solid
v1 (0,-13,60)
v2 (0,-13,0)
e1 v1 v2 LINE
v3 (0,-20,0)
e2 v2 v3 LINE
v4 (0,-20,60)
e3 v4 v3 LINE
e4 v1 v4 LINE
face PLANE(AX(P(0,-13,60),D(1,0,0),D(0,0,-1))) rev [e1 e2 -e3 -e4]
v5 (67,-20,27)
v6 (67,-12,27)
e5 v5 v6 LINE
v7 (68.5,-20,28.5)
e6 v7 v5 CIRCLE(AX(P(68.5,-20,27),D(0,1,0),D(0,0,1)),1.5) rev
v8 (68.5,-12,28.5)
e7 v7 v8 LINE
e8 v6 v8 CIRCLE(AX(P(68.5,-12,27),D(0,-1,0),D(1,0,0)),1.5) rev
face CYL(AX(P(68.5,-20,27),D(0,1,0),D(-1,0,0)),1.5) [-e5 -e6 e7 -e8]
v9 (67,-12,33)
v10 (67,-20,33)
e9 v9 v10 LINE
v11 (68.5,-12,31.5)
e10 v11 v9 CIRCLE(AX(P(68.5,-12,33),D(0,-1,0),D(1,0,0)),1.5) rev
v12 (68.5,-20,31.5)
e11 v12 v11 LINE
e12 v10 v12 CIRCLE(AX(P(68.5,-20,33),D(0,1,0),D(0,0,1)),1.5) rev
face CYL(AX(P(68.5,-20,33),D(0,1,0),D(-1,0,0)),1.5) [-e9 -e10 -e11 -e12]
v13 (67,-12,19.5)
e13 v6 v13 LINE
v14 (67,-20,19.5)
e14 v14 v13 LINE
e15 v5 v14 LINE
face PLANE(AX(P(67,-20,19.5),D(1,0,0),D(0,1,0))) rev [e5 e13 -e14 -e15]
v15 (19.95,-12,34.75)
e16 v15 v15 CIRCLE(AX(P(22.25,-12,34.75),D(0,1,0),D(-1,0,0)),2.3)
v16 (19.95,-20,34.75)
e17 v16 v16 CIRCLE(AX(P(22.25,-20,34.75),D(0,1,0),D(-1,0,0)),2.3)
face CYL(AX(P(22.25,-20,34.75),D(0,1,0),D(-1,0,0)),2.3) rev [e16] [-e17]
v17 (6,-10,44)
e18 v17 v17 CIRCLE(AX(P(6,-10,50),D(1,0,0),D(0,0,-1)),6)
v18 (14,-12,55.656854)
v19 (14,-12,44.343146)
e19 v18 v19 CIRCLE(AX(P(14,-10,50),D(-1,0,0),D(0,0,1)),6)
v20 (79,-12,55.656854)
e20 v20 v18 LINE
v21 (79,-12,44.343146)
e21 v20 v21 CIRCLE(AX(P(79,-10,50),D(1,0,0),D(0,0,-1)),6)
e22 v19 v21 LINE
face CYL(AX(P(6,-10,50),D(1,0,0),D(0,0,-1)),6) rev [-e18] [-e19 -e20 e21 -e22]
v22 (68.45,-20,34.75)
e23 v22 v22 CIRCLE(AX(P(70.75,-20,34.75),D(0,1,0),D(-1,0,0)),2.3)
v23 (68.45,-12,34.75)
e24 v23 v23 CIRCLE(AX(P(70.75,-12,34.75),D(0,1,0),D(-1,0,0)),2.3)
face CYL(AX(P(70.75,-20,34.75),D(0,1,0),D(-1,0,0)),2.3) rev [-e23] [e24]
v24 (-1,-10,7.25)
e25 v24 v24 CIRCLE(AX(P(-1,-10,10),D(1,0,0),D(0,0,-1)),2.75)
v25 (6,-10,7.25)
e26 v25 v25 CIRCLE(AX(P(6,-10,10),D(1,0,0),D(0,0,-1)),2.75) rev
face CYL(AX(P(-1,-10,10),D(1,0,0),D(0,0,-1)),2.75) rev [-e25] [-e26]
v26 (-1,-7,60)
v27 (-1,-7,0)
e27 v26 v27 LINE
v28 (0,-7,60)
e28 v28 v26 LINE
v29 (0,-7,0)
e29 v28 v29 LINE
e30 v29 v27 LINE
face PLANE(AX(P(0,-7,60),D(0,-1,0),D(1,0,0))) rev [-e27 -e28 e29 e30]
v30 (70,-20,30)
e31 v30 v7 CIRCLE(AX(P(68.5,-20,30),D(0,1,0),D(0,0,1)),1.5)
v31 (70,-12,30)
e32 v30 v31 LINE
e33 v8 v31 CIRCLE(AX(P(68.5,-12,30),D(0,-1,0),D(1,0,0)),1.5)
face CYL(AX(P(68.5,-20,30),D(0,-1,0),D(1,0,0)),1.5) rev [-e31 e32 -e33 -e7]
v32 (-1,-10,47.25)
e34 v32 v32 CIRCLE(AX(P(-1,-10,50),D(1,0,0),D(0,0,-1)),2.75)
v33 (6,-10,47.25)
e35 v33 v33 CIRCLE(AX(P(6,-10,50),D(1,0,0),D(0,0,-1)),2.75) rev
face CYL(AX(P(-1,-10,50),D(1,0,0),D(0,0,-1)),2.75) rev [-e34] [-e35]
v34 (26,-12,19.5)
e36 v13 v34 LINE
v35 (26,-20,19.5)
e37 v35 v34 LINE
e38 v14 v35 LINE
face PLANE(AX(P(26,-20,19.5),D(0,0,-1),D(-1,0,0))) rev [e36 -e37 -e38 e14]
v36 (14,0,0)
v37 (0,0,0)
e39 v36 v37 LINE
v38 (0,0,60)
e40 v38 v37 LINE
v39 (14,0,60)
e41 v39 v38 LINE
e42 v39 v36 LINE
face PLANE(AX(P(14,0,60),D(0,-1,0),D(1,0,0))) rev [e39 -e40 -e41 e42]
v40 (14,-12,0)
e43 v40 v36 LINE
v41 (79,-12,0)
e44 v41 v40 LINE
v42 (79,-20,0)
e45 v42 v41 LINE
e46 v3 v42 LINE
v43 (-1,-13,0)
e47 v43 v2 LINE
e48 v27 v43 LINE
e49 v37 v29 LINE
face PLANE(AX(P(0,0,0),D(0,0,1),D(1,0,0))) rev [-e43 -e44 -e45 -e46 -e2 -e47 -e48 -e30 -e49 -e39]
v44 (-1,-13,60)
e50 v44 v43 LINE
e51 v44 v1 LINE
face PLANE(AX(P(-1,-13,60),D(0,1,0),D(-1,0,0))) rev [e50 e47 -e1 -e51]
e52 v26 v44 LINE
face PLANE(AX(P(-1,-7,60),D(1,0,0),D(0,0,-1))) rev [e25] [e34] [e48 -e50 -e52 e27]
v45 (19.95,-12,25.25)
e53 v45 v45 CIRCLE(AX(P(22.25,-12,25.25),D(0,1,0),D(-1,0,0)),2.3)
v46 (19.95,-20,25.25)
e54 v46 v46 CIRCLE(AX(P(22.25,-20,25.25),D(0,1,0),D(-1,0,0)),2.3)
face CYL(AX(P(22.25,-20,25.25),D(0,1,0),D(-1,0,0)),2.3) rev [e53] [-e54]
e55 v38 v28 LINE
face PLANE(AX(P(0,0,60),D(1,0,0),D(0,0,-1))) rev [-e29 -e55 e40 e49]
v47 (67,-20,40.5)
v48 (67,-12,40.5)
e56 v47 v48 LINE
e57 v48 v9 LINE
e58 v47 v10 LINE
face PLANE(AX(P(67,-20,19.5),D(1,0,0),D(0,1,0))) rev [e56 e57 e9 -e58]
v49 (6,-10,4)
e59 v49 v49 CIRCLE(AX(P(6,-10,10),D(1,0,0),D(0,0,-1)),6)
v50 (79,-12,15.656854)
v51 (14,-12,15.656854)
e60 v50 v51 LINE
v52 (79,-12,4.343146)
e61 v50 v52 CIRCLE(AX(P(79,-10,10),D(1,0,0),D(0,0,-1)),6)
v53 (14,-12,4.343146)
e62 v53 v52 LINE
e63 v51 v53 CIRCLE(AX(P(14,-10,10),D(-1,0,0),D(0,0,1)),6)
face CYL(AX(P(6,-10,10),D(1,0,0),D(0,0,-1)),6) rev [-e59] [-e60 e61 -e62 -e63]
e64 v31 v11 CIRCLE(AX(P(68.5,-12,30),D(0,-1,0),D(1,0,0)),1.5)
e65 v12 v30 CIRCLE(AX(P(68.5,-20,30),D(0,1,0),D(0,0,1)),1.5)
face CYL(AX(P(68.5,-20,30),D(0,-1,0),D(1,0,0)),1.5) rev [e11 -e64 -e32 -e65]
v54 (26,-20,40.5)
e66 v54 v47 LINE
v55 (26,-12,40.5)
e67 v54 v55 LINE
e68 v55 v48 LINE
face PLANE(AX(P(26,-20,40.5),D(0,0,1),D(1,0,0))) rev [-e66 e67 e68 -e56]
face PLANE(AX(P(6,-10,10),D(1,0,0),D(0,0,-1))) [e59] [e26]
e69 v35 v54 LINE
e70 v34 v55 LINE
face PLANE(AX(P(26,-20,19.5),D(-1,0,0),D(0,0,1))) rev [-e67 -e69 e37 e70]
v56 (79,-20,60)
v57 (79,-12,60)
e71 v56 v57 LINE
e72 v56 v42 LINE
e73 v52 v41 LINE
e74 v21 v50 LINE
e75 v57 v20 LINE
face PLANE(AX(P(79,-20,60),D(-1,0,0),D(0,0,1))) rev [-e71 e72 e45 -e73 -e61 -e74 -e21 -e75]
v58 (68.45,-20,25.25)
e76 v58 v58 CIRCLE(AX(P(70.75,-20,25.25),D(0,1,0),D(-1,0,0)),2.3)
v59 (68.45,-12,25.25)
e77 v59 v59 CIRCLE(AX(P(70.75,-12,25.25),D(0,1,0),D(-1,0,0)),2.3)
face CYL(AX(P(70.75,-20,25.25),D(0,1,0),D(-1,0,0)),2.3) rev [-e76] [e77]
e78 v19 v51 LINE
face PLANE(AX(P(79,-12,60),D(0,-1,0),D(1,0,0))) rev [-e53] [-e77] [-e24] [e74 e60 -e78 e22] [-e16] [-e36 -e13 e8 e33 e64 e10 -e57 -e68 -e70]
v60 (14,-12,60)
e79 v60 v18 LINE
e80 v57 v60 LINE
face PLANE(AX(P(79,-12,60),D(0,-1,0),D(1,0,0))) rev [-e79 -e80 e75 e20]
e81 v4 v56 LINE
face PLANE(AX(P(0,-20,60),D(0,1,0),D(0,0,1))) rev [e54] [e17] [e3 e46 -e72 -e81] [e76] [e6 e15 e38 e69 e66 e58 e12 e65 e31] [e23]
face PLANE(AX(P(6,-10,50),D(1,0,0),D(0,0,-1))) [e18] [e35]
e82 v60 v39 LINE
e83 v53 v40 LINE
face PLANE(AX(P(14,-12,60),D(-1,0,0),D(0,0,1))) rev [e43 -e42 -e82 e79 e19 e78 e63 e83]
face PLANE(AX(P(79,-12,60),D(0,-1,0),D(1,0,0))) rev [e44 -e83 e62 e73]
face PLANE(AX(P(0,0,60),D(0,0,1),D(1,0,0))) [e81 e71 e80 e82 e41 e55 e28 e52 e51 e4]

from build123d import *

# Parameters (mm, degrees)
SALIENTE_EXTRUIR1_DEPTH = 60
CROQUIS2_R              = 2.75
CORTAR_EXTRUIR1_DEPTH   = 91.691785736
CROQUIS4_R              = 6
CORTAR_EXTRUIR2_DEPTH   = 73
CROQUIS5_W              = 41
CROQUIS5_H              = 21
CORTAR_EXTRUIR3_DEPTH   = 100.924971854
CROQUIS6_R              = 2.3
CORTAR_EXTRUIR4_DEPTH   = 100.924971854
CROQUIS7_W              = 3
CROQUIS7_H              = 3
CORTAR_EXTRUIR5_DEPTH   = 90.269255626
REDONDEO3_R             = 1.5


with BuildPart() as part:
    # Croquis1 → Saliente-Extruir1 (new body)
    with BuildSketch(Plane.XY):
        Polygon((0, 0), (0, -7), (-1, -7), (-1, -13), (0, -13), (0, -20), (79, -20), (79, -12), (14, -12), (14, 0), align=None)
    extrude(amount=SALIENTE_EXTRUIR1_DEPTH)

    # Croquis2 → Cortar-Extruir1 (cut, through all)
    with BuildSketch(Plane(origin=(14, 0, 0), x_dir=(0, 0, -1), z_dir=(1, 0, 0))):
        with Locations((-50, -10)):
            Circle(CROQUIS2_R)
        with Locations((-10, -10)):
            Circle(CROQUIS2_R)
    extrude(amount=-CORTAR_EXTRUIR1_DEPTH, mode=Mode.SUBTRACT)

    # Croquis4 → Cortar-Extruir2 (cut)
    with BuildSketch(Plane(origin=(79, 0, 0), x_dir=(0, 0, -1), z_dir=(1, 0, 0))):
        with Locations((-50, -10)):
            Circle(CROQUIS4_R)
        with Locations((-10, -10)):
            Circle(CROQUIS4_R)
    extrude(amount=-CORTAR_EXTRUIR2_DEPTH, mode=Mode.SUBTRACT)

    # Croquis5 → Cortar-Extruir3 (cut, through all)
    with BuildSketch(Plane(origin=(0, -12, 0), x_dir=(1, 0, 0), z_dir=(0, 1, 0))):
        with Locations((46.5, -30)):
            Rectangle(CROQUIS5_W, CROQUIS5_H)
    extrude(amount=-CORTAR_EXTRUIR3_DEPTH, mode=Mode.SUBTRACT)

    # Croquis6 → Cortar-Extruir4 (cut, through all)
    with BuildSketch(Plane(origin=(0, -12, 0), x_dir=(1, 0, 0), z_dir=(0, 1, 0))):
        with Locations(Location((22.25, -25.25, 0), (0, 0, 180))):
            Circle(CROQUIS6_R)
        with Locations(Location((22.25, -34.75, 0), (0, 0, 180))):
            Circle(CROQUIS6_R)
        with Locations(Location((70.75, -25.25, 0), (0, 0, 180))):
            Circle(CROQUIS6_R)
        with Locations(Location((70.75, -34.75, 0), (0, 0, 180))):
            Circle(CROQUIS6_R)
    extrude(amount=-CORTAR_EXTRUIR4_DEPTH, mode=Mode.SUBTRACT)

    # Croquis7 → Cortar-Extruir5 (cut, through all)
    with BuildSketch(Plane(origin=(14, -12, 60), x_dir=(1, 0, 0), z_dir=(0, 1, 0))):
        with Locations((54.5, 30)):
            Rectangle(CROQUIS7_W, CROQUIS7_H)
    extrude(amount=-CORTAR_EXTRUIR5_DEPTH, mode=Mode.SUBTRACT)

    # Redondeo3
    redondeo3_edges = [part.edges().sort_by_distance(p)[0] for p in [
        (70, -16, 31.5),
        (70, -16, 28.5),
    ]]
    fillet(redondeo3_edges, radius=REDONDEO3_R - 0.0001)  # a hair under: the kernel refuses the full size
    redondeo3_2_edges = [part.edges().sort_by_distance(p)[0] for p in [
        (67, -16, 28.5),
        (67, -16, 31.5),
    ]]
    fillet(redondeo3_2_edges, radius=REDONDEO3_R)


solid = part.part
